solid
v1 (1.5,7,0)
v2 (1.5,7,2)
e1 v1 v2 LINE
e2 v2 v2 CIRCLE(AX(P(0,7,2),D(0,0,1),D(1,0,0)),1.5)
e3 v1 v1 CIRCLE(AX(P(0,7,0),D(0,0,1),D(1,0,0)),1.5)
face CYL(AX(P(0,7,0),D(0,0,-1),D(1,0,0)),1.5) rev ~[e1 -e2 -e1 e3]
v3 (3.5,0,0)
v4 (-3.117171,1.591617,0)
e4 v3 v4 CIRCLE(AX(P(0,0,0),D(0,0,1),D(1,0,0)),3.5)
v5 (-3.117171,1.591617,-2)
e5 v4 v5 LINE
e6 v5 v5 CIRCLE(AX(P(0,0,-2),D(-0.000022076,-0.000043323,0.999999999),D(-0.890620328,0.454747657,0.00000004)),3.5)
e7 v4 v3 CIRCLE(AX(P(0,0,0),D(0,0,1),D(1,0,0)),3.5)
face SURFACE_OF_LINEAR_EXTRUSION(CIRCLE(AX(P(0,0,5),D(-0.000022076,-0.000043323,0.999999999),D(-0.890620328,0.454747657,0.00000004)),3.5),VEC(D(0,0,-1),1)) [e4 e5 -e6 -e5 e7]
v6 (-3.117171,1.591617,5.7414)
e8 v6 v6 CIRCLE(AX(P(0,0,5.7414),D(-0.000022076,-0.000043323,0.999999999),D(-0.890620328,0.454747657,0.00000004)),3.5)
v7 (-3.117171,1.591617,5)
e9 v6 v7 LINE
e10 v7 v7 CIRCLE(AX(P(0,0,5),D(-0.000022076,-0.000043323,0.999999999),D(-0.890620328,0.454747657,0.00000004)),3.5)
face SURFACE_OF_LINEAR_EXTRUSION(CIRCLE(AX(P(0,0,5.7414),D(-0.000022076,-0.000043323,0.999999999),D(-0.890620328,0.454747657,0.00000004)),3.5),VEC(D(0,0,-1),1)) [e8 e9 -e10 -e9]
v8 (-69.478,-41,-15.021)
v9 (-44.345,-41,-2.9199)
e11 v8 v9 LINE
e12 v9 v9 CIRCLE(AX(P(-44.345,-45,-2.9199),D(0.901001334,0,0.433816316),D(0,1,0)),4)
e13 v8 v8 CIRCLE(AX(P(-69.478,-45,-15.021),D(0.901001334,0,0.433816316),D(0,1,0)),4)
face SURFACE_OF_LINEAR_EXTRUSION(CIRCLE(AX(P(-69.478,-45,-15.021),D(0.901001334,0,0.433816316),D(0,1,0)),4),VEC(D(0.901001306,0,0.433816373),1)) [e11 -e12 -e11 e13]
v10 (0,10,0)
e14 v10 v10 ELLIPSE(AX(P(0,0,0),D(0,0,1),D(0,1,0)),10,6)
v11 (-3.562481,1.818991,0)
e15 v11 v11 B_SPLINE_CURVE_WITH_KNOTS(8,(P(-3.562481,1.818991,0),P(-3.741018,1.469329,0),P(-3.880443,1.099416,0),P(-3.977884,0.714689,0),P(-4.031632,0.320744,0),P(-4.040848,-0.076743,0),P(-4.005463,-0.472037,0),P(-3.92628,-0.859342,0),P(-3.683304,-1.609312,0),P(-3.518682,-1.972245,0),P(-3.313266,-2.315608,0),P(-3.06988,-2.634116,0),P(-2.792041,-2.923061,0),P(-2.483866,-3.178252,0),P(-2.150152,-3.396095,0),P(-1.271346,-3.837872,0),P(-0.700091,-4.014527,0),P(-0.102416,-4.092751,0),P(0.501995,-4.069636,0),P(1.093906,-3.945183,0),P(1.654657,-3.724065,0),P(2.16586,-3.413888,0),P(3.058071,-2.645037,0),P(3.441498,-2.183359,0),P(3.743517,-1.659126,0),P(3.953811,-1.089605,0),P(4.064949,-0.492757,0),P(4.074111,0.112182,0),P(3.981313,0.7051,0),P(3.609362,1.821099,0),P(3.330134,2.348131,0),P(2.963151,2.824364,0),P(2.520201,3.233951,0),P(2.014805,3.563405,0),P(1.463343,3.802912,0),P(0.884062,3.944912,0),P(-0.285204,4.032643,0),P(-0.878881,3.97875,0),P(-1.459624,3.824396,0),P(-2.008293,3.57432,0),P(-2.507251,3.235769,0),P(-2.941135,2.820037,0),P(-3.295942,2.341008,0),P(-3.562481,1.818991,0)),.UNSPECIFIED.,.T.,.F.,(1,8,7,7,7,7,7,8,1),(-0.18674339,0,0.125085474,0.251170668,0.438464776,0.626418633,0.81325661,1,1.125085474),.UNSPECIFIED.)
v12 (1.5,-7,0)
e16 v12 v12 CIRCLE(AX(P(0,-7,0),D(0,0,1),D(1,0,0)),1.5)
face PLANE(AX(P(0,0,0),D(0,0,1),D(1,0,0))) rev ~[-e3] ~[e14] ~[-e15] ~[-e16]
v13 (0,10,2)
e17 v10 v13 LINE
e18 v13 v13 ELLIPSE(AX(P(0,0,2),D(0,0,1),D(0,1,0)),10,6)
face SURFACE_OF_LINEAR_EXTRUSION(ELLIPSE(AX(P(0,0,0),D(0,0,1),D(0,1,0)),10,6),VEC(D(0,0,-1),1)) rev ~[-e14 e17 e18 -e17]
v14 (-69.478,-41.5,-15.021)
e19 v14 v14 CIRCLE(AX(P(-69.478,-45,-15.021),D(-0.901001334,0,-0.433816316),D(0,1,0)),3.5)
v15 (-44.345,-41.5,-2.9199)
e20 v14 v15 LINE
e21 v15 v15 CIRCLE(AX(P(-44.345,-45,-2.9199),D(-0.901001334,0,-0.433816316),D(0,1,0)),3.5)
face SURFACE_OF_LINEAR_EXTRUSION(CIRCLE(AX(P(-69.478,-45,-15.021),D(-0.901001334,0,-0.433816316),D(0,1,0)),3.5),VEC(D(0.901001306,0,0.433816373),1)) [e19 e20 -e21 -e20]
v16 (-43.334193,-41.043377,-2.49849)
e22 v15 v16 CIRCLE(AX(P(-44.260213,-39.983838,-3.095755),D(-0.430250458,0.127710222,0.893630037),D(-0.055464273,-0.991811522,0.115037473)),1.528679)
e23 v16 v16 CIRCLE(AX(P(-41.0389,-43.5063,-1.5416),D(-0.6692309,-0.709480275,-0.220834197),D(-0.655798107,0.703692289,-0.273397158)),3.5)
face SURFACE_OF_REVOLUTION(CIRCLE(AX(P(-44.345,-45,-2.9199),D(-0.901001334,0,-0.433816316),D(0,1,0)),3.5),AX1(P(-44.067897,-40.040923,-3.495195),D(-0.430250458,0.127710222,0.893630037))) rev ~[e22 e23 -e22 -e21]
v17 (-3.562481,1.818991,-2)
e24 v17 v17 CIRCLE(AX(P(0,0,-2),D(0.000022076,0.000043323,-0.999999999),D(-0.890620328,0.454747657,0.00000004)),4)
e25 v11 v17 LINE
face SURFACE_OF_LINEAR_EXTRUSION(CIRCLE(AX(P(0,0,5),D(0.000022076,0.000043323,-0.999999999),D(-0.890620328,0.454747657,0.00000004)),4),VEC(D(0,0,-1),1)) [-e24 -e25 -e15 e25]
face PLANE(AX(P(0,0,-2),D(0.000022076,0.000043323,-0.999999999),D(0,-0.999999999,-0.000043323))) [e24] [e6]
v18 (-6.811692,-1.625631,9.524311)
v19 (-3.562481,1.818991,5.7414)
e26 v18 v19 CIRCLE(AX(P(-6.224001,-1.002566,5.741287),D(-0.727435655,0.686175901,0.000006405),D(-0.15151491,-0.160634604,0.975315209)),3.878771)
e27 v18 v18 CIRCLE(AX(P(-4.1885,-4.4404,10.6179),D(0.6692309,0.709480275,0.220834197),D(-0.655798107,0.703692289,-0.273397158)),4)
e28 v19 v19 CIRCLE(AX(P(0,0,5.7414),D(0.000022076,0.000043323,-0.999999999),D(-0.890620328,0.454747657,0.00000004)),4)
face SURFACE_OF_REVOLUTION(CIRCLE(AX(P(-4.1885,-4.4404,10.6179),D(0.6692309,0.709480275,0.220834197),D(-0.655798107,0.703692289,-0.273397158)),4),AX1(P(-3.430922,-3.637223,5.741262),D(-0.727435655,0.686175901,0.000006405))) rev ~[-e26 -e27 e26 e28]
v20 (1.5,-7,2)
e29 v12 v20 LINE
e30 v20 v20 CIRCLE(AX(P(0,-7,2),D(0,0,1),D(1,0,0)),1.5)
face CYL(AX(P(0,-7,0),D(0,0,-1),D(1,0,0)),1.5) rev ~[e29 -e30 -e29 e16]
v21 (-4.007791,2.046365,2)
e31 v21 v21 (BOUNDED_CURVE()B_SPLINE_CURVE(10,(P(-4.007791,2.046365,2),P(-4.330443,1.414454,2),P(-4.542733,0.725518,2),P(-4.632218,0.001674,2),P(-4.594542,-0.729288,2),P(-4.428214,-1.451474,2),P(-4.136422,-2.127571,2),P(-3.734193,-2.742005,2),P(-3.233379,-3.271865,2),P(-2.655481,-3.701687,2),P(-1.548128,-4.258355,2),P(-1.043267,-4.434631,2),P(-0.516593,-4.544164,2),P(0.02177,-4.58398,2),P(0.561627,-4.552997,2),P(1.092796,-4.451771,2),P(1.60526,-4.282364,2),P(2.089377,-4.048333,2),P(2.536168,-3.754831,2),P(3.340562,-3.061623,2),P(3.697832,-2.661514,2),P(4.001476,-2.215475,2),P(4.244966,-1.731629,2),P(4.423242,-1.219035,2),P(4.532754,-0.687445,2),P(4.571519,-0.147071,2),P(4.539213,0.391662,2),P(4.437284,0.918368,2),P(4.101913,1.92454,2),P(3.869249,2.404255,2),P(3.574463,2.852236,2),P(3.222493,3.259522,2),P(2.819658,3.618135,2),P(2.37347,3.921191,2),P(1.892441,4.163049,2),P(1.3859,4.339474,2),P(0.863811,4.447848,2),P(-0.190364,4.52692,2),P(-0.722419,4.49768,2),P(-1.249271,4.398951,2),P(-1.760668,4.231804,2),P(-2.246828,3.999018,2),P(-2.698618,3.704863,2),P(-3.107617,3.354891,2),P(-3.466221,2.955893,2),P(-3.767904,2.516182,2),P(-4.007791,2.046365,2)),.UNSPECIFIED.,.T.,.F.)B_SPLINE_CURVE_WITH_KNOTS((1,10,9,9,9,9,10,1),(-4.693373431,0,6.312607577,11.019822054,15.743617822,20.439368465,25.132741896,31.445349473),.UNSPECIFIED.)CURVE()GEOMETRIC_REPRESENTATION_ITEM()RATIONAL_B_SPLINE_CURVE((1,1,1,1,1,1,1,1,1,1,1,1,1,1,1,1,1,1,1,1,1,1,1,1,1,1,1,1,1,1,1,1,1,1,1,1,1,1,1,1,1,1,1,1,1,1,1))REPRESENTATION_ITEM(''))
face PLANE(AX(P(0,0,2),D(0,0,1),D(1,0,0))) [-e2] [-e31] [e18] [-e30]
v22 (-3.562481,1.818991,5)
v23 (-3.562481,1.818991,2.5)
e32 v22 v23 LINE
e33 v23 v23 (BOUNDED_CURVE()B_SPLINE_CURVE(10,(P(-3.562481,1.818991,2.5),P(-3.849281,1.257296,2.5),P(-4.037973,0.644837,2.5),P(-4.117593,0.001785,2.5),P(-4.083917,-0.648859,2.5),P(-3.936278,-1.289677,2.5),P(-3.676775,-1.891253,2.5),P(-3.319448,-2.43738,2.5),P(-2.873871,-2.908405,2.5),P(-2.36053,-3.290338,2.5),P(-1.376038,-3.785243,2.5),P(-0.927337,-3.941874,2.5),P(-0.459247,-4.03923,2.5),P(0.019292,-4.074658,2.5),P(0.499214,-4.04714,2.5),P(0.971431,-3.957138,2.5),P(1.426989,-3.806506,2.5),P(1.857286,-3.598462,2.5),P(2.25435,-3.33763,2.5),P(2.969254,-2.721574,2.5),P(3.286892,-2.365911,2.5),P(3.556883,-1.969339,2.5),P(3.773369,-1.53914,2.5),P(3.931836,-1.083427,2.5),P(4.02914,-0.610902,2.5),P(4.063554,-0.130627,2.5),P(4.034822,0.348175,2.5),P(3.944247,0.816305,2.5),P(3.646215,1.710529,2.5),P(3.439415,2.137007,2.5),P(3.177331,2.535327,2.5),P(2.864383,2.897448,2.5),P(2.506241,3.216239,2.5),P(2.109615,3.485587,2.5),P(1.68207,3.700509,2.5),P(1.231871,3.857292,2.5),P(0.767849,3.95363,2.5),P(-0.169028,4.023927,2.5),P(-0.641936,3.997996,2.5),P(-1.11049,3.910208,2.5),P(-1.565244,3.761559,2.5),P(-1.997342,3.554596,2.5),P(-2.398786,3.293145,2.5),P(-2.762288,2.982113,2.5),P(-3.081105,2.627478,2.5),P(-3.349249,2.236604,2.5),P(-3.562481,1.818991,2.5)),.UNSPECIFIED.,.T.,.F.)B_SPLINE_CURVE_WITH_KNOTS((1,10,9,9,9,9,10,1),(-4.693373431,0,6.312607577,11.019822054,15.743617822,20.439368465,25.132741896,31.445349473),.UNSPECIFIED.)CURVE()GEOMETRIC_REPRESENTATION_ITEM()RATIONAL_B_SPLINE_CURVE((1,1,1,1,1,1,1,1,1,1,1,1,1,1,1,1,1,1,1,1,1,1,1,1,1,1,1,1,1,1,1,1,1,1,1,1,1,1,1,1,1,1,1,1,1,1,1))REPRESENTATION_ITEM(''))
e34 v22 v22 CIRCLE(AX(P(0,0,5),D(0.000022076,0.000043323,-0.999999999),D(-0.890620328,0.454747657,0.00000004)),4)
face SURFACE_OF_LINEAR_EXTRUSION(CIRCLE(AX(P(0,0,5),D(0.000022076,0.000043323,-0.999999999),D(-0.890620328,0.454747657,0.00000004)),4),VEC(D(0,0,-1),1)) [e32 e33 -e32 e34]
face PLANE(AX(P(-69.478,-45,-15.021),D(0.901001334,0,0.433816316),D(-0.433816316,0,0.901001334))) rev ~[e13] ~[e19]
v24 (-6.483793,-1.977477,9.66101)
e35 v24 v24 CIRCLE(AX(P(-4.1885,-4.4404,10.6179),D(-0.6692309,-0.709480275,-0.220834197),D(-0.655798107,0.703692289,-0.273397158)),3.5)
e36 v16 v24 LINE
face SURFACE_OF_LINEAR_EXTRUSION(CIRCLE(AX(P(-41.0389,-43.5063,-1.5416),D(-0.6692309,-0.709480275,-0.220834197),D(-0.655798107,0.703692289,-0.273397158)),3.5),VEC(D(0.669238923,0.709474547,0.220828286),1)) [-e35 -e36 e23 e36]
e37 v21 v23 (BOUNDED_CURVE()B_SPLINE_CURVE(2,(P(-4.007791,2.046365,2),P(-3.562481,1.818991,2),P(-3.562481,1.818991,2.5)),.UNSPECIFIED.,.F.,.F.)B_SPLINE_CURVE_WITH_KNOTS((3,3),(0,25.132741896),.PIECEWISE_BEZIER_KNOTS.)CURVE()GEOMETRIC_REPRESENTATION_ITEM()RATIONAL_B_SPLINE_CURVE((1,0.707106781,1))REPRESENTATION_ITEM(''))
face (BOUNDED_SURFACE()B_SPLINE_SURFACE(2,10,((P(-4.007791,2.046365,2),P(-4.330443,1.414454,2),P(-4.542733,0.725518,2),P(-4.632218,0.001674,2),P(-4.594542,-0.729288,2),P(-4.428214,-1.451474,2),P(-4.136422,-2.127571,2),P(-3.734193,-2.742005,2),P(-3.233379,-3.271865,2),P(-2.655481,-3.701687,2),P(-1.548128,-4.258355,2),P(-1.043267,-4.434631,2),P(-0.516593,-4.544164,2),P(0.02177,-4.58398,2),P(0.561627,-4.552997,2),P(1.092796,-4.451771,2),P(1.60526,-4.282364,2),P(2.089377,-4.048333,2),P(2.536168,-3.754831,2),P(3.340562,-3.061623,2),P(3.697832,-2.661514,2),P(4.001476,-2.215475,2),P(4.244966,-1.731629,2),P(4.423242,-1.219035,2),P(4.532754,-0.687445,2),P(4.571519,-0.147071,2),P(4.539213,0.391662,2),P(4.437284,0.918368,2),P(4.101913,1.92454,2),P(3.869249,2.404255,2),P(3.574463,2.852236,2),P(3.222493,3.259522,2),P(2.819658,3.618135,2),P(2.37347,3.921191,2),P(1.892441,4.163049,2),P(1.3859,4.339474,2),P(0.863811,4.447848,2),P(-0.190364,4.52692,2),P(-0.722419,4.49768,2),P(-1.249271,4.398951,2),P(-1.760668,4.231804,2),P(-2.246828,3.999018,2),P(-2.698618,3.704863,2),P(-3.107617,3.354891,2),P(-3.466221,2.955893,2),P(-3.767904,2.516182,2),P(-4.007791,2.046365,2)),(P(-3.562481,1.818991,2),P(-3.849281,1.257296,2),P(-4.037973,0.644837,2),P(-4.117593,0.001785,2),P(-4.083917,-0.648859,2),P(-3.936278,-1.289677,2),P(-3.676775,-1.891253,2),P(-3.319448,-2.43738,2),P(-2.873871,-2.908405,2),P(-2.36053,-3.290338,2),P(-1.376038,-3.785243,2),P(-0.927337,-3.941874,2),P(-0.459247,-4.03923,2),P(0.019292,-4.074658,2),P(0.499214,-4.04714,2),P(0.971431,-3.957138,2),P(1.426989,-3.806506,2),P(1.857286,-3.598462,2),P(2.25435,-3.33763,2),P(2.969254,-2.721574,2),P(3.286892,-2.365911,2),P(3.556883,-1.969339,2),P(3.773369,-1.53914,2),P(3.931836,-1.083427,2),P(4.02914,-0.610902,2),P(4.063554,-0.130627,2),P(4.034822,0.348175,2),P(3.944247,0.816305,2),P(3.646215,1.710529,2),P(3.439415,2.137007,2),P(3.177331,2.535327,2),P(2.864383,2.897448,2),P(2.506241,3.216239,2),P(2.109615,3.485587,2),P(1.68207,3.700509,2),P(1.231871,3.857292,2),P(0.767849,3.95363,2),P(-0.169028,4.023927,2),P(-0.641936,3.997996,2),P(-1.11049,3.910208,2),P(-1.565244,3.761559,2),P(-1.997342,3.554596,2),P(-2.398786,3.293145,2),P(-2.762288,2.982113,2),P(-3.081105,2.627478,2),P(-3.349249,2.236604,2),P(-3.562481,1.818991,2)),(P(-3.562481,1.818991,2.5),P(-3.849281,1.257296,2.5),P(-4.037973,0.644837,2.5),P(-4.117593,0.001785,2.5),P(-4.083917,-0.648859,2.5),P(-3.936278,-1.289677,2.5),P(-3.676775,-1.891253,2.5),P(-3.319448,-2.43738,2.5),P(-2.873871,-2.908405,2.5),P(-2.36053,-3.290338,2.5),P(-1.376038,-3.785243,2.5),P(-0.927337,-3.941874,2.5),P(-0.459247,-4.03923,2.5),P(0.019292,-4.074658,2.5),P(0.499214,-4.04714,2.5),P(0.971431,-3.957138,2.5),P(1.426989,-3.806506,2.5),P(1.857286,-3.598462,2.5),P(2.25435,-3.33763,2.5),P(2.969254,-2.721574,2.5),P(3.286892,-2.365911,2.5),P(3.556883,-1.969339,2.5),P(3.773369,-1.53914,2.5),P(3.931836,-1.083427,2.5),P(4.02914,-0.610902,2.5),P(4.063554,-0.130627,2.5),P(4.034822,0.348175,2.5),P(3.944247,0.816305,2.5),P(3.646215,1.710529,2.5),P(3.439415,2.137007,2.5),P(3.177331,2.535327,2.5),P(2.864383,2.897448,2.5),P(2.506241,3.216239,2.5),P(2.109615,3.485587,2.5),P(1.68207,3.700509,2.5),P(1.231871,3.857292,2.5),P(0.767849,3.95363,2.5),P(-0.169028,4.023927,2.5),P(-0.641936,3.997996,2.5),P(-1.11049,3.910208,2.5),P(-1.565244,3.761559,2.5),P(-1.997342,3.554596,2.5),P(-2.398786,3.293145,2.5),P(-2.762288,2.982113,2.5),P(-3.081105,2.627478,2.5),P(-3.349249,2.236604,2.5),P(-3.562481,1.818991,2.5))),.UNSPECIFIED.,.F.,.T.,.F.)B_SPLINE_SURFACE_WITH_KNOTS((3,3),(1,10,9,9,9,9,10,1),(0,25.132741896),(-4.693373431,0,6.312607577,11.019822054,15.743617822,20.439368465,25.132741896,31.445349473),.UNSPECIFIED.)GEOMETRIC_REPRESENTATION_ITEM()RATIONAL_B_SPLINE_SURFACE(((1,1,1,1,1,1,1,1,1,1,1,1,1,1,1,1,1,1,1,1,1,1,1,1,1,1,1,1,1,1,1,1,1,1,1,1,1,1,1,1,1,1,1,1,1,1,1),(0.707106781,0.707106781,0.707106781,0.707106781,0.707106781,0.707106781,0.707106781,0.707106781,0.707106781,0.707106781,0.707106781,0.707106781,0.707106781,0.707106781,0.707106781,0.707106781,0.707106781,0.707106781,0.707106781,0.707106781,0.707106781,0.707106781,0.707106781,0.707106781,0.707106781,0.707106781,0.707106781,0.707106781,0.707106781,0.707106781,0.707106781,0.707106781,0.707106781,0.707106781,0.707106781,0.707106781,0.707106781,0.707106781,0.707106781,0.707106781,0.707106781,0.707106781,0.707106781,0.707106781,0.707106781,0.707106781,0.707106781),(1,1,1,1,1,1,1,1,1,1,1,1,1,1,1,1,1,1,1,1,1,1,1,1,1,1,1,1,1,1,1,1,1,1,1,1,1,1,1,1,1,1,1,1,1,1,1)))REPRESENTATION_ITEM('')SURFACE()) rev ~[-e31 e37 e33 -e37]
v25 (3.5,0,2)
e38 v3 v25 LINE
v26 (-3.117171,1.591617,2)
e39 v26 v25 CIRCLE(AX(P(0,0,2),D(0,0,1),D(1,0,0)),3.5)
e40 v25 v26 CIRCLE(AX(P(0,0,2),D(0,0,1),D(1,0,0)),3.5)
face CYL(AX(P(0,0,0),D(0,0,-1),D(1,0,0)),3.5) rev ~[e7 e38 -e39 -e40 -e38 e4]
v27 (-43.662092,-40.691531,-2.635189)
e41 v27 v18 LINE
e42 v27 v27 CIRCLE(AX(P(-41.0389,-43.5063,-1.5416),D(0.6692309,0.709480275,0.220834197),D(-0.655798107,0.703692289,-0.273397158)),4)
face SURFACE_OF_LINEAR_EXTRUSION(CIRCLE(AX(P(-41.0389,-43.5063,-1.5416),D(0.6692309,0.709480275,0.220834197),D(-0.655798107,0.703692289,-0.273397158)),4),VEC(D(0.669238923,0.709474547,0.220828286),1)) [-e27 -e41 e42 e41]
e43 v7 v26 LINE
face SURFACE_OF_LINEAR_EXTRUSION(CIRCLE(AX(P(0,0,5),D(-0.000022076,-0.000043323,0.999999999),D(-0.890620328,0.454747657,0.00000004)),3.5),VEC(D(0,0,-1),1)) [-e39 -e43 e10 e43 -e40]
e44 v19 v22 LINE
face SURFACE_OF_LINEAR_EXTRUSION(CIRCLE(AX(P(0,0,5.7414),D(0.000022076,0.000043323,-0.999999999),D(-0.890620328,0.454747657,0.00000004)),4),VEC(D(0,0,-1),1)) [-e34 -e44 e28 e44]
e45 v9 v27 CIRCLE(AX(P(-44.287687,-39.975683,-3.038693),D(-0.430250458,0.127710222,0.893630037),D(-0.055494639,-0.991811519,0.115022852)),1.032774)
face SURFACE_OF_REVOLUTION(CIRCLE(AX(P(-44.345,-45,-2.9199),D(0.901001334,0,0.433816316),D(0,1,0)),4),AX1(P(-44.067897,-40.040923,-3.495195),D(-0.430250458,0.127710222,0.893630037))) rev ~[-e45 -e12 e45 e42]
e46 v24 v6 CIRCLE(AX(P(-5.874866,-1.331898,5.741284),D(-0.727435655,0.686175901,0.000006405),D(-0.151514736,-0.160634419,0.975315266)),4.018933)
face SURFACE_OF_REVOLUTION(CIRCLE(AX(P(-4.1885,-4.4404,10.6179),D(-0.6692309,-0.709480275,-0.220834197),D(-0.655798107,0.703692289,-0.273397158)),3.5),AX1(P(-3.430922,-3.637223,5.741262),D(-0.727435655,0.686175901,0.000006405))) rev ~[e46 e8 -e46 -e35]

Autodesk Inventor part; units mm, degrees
ref_plane "YZ Plane" through (0, 0, 0) normal (1, 0, 0) x (0, 1, 0)
sketch "Sketch1" plane through (0, 0, 0) normal (0, 0, 1) x (1, 0, 0)
  line L0 (0, 0) -> (0, 10) construction
  line L1 (0, 0) -> (6, 0) construction
  circle A0 centre (0, 0) radius 3.5
  circle A1 centre (0, 7) radius 1.5
  circle A2 centre (0, -7) radius 1.5
  ellipse E0 centre (0, 0) end of major axis (6, 0) minor radius 10
  dimension "d0" = 10
  dimension "d1" = 6
  dimension "d2" = 7
  dimension "d4" = 3
  dimension "d5" = 3
  dimension "d6" = 7
  dimension "d7" = 7
extrude "Extrusion1" add sketch "Sketch1" along normal blind 2
sketch "Sketch2" plane through (0, 0, 0) normal (1, 0, 0) x (0, 1, 0)
  line L0 (0, -2) -> (0, 5) construction
  point P0 (0, 0)
  dimension "d10" = 2
  dimension "d11" = 7
ref_plane "Work Plane1" through (0, -45, 0) normal (0, 1, 0) x (-1, 0, 0)
sketch "Sketch3" plane through (0, -45, 0) normal (0, 1, 0) x (-1, 0, 0)
  line L0 (0, 0) -> (0, -83.2566) construction
  line L1 (69.478, -15.021) -> (43.1392, -69.7245) construction
  line L2 (69.478, -15.021) -> (42.448, -2.0065) construction
  dimension "d13" = 25.71
  dimension "d14" = 69.478
  dimension "d16" = 15.021
  dimension "d17" = 30
  dimension "d18" = 90
ref_plane "Work Plane2" through (-69.478, -45, -15.021) normal (0.9010013, 0, 0.4338163) x (0, 1, 0)
sketch "Sketch4" plane through (-69.478, -45, -15.021) normal (0.9010013, 0, 0.4338163) x (0, 1, 0)
  circle A0 centre (0, 0) radius 4
  circle A1 centre (0, 0) radius 3.5
  point P0 (45, -16.6068)
  dimension "d19" = 8
  dimension "d20" = 7
sketch3d "3D Sketch1"
  line L0 (-69.478, -45, -15.021) -> (-44.345, -45, -2.9199)
  arc A0 (-44.345, -45, -2.9199) -> (-41.0389, -43.5063, -1.5416) centre (-44.0679, -40.0409, -3.4952) ccw
  line L1 (-41.0389, -43.5063, -1.5416) -> (-4.1885, -4.4404, 10.6179)
  arc A1 (-4.1885, -4.4404, 10.6179) -> (0, 0, 5.7414) centre (-3.4309, -3.6372, 5.7414) ccw
  line L2 (0, 0, 5.7414) -> (0, 0, 5)
  line L3 (0, 0, 5) -> (0, 0, -2)
  dimension "d21" = 5
  dimension "d22" = 5
  dimension "d23" = 7
sweep "Sweep1" add profiles "Sketch4" path "3D Sketch1"
fillet "Fillet1" radius 0.5 1 edges at (3.5625, -1.819, 2)
equation "\"d7\" = d6"
equation "\"d22\" = d21"
properties part number "Component 51(Intake Pipe)"
